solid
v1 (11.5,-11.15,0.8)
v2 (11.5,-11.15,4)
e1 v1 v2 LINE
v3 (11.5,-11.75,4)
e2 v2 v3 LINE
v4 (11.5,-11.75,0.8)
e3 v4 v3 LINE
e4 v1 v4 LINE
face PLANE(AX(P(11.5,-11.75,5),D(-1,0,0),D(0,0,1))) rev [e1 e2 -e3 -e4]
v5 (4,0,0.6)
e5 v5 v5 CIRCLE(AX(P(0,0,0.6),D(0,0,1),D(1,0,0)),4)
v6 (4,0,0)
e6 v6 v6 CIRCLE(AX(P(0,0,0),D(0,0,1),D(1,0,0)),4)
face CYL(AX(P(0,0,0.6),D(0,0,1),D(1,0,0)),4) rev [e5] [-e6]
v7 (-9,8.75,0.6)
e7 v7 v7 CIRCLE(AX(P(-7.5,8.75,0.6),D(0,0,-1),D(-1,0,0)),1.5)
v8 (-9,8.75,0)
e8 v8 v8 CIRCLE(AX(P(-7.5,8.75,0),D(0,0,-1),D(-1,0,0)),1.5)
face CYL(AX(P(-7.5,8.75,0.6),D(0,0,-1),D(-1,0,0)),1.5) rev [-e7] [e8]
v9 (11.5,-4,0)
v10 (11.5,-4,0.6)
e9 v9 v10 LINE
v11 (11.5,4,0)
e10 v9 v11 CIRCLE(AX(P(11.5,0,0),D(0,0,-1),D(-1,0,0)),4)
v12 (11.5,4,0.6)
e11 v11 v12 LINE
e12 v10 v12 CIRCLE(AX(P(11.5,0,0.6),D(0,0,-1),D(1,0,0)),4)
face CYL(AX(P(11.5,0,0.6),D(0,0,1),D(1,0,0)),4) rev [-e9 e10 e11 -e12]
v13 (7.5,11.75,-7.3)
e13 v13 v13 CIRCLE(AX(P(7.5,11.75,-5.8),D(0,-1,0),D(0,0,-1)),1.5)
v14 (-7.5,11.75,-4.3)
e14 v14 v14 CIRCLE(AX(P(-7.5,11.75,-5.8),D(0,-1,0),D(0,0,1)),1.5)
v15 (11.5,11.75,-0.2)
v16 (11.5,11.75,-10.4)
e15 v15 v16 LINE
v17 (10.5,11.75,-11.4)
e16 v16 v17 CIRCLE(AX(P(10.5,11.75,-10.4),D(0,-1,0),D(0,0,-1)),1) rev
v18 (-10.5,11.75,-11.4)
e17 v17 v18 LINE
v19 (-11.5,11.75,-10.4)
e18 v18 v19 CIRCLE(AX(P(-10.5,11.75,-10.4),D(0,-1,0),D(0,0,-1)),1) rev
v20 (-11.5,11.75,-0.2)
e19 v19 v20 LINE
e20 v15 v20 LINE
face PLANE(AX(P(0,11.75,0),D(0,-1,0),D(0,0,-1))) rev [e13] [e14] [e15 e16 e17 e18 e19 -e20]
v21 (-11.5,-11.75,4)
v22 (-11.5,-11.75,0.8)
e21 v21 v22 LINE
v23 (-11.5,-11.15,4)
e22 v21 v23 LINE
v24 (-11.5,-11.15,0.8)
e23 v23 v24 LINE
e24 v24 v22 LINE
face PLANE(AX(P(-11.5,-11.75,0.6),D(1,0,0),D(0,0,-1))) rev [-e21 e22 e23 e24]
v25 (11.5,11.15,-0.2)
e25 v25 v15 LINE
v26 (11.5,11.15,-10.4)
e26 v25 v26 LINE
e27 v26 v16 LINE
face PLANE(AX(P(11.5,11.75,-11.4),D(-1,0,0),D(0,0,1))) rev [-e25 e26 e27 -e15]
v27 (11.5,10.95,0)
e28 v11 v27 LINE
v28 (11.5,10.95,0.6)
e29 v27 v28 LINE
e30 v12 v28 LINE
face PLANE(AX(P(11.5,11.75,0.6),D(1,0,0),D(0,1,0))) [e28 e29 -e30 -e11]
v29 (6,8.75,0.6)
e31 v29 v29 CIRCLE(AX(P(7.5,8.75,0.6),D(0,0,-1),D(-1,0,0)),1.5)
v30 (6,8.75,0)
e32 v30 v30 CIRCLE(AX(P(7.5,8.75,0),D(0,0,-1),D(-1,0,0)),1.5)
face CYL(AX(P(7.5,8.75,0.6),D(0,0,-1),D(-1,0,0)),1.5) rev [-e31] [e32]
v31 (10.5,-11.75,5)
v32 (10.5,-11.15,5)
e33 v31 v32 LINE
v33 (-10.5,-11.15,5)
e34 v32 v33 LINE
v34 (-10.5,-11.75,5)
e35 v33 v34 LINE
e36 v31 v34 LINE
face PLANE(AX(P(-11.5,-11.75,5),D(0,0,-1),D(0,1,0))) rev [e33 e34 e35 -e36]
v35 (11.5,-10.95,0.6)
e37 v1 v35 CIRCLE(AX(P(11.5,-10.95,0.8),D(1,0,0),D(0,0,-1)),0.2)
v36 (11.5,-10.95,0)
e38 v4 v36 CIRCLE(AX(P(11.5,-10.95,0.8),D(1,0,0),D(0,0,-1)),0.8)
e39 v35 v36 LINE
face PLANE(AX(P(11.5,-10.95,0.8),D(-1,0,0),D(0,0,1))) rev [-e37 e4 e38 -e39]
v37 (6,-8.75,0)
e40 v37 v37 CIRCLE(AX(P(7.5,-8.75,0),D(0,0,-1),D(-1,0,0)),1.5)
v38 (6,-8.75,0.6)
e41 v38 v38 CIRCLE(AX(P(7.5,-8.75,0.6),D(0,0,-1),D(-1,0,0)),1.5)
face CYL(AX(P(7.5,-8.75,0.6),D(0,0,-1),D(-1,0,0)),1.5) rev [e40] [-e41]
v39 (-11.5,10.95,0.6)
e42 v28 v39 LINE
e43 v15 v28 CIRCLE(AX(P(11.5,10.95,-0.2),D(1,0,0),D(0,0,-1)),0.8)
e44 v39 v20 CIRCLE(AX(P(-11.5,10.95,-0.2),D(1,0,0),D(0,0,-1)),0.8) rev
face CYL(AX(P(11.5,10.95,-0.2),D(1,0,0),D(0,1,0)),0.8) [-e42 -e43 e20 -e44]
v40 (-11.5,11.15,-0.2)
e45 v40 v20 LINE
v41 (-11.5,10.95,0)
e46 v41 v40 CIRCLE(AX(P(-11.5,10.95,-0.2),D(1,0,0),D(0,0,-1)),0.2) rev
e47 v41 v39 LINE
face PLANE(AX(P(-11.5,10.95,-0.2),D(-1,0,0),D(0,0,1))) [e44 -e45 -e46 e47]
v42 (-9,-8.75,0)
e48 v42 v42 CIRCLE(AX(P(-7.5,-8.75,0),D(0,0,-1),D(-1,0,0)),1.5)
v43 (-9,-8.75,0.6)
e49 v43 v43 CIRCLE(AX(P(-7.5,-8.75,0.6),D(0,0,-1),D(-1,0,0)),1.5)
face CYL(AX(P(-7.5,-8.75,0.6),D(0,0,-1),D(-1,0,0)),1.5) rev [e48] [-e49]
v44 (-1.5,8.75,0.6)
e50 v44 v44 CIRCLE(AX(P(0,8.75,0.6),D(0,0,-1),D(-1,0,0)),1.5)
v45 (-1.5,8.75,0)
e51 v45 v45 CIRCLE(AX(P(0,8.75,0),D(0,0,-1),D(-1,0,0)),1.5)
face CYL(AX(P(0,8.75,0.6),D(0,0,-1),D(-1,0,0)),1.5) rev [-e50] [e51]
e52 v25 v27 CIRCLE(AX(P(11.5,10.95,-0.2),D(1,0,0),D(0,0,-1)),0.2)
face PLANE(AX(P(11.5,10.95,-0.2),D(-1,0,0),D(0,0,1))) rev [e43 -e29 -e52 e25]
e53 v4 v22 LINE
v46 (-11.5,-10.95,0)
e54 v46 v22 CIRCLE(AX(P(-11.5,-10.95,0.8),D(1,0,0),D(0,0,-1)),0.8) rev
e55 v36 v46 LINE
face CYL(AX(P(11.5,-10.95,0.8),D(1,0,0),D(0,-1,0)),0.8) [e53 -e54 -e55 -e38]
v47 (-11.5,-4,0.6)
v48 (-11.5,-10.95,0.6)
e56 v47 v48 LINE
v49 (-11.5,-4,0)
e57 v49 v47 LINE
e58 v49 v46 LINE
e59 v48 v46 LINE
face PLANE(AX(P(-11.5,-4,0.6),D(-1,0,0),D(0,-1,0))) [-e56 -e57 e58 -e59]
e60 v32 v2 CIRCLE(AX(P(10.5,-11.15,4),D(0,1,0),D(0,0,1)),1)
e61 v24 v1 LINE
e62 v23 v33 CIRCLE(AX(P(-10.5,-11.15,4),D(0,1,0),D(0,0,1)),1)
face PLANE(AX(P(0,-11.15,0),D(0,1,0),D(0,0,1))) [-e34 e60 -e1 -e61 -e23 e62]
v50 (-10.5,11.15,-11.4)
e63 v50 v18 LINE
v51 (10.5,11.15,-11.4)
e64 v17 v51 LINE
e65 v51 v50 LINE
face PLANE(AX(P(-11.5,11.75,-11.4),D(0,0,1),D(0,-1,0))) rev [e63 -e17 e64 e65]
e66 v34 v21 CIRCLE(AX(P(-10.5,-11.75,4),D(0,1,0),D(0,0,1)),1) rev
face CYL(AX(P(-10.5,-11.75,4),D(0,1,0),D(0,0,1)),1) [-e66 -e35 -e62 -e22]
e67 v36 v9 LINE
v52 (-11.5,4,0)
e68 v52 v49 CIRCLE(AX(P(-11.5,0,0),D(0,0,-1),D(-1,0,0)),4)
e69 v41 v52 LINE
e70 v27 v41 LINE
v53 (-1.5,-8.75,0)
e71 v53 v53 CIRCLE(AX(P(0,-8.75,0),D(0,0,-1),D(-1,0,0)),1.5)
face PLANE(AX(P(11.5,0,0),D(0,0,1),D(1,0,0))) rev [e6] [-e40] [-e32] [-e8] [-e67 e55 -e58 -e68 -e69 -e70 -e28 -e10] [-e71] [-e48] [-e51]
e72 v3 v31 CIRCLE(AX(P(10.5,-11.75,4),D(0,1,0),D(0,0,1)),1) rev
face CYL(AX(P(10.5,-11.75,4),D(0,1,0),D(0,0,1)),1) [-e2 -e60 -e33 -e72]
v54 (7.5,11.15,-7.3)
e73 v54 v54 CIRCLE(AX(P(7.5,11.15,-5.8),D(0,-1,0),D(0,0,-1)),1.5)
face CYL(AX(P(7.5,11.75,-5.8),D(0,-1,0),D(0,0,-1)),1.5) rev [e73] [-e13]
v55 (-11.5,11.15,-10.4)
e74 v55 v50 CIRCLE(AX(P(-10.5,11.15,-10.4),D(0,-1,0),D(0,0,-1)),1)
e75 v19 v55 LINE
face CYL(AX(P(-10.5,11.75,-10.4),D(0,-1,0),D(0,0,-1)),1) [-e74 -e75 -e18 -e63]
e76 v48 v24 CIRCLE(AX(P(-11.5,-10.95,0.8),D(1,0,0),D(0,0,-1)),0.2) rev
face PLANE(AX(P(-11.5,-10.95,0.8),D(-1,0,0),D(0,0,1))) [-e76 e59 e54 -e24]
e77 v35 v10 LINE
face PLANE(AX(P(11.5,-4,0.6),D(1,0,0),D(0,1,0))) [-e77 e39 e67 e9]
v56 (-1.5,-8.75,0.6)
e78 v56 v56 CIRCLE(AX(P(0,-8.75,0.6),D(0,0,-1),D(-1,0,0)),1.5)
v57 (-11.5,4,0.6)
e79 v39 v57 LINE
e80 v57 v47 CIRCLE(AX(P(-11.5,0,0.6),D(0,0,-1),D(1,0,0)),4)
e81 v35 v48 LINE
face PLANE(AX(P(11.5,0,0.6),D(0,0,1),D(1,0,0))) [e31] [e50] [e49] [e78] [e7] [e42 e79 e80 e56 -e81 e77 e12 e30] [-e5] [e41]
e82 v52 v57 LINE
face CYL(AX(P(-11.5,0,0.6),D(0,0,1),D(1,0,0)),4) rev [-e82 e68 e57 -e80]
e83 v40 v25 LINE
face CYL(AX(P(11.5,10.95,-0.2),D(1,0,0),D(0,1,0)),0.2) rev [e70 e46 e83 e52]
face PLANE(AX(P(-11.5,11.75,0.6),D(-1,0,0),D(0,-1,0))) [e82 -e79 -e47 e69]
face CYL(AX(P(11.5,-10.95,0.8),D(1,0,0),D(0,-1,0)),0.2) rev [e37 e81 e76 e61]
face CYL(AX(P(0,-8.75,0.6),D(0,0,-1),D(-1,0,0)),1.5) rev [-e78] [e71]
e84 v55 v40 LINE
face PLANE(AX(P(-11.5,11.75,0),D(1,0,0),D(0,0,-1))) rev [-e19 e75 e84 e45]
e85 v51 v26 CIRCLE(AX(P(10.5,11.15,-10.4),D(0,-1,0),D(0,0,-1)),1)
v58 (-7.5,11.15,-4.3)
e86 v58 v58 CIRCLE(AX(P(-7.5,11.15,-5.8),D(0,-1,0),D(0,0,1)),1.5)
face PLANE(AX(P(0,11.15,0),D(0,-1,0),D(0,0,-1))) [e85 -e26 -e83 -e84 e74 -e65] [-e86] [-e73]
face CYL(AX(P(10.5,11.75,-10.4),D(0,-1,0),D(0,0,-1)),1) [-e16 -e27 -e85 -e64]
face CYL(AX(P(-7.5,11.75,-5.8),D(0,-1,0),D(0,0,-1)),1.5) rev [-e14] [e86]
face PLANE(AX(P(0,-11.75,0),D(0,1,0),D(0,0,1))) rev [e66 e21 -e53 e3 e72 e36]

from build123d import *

# Parameters (mm, degrees)
SKETCH1_R                    = 4
BOSS_EXTRUDE1_DEPTH          = 0.6
EDGE_FLANGE1_STRIP_W         = 2.8
EDGE_FLANGE1_STRIP_H         = 0.6
EDGE_FLANGE1_STRIP_CUT_DEPTH = 23
EDGE_FLANGE1_DEPTH           = 23
SKETCH14_R                   = 1.5
CUT_EXTRUDE3_DEPTH           = 21.00681134
EDGE_FLANGE2_STRIP_W         = 2.8
EDGE_FLANGE2_STRIP_H         = 0.6
EDGE_FLANGE2_STRIP_CUT_DEPTH = 23
EDGE_FLANGE2_DEPTH           = 23
SKETCH13_R                   = 1.5
CUT_EXTRUDE1_DEPTH           = 29.046746692
FILLET2_R                    = 1


# Sheet-metal steps are written as plain solids
with BuildPart() as part:
    # Sketch1 → Boss-Extrude1 (new body)
    with BuildSketch(Plane.XY):
        with BuildLine():
            Line((11.5, -4), (11.5, -11.75))
            Line((11.5, -11.75), (-11.5, -11.75))
            Line((-11.5, -11.75), (-11.5, -4))
            ThreePointArc((-11.5, -4), (-7.5, 0), (-11.5, 4))
            Line((-11.5, 4), (-11.5, 11.75))
            Line((-11.5, 11.75), (11.5, 11.75))
            Line((11.5, 11.75), (11.5, 4))
            ThreePointArc((11.5, 4), (7.5, 0), (11.5, -4))
        make_face()
        Circle(SKETCH1_R, mode=Mode.SUBTRACT)
    extrude(amount=BOSS_EXTRUDE1_DEPTH)

    # Edge-Flange1 strip (across the edge) → Edge-Flange1 strip cut (cut)
    with BuildSketch(Plane(origin=(-11.5, 11.75, 0), x_dir=(0, -1, 0), z_dir=(1, 0, 0))):
        with Locations((-0.6, -0.3)):
            Rectangle(EDGE_FLANGE1_STRIP_W, EDGE_FLANGE1_STRIP_H)
    extrude(amount=EDGE_FLANGE1_STRIP_CUT_DEPTH, mode=Mode.SUBTRACT)

    # Edge-Flange1 section (across the edge) → Edge-Flange1 (add)
    with BuildSketch(Plane(origin=(-11.5, 11.75, 0), x_dir=(0, -1, 0), z_dir=(1, 0, 0))):
        with BuildLine():
            Line((0, 0.2), (0, 11.4))
            Line((0, 11.4), (0.6, 11.4))
            Line((0.6, 11.4), (0.6, 0.2))
            ThreePointArc((0.6, 0.2), (0.658578644, 0.058578644), (0.8, 0))
            Line((0.8, 0), (0.8, -0.6))
            ThreePointArc((0.8, -0.6), (0.234314575, -0.365685425), (0, 0.2))
        make_face()
    extrude(amount=EDGE_FLANGE1_DEPTH)

    # Sketch14 → Cut-Extrude3 (cut, through all)
    with BuildSketch(Plane(origin=(0, 0, 0), x_dir=(-1, 0, 0), z_dir=(0, 0, -1))):
        with Locations((-7.5, -8.75)):
            Circle(SKETCH14_R)
        with Locations((0, -8.75)):
            Circle(SKETCH14_R)
        with Locations((7.5, -8.75)):
            Circle(SKETCH14_R)
        with Locations((7.5, 8.75)):
            Circle(SKETCH14_R)
        with Locations((0, 8.75)):
            Circle(SKETCH14_R)
        with Locations((-7.5, 8.75)):
            Circle(SKETCH14_R)
    extrude(amount=-CUT_EXTRUDE3_DEPTH, mode=Mode.SUBTRACT)

    # Edge-Flange2 strip (across the edge) → Edge-Flange2 strip cut (cut)
    with BuildSketch(Plane(origin=(-11.5, -11.75, 0.6), x_dir=(0, 1, 0), z_dir=(1, 0, 0))):
        with Locations((-0.6, -0.3)):
            Rectangle(EDGE_FLANGE2_STRIP_W, EDGE_FLANGE2_STRIP_H)
    extrude(amount=EDGE_FLANGE2_STRIP_CUT_DEPTH, mode=Mode.SUBTRACT)

    # Edge-Flange2 section (across the edge) → Edge-Flange2 (add)
    with BuildSketch(Plane(origin=(-11.5, -11.75, 0.6), x_dir=(0, 1, 0), z_dir=(1, 0, 0))):
        with BuildLine():
            Line((0, 0.2), (0, 4.4))
            Line((0, 4.4), (0.6, 4.4))
            Line((0.6, 4.4), (0.6, 0.2))
            ThreePointArc((0.6, 0.2), (0.658578644, 0.058578644), (0.8, 0))
            Line((0.8, 0), (0.8, -0.6))
            ThreePointArc((0.8, -0.6), (0.234314575, -0.365685425), (0, 0.2))
        make_face()
    extrude(amount=EDGE_FLANGE2_DEPTH)

    # Sketch13 → Cut-Extrude1 (cut, through all)
    with BuildSketch(Plane.XZ.offset(-11.15)):
        with Locations(Location((7.5, -5.8, 0), (0, 0, 270))):
            Circle(SKETCH13_R)
        with Locations(Location((-7.5, -5.8, 0), (0, 0, 90))):
            Circle(SKETCH13_R)
    extrude(amount=-CUT_EXTRUDE1_DEPTH, mode=Mode.SUBTRACT)

    # Fillet2
    fillet2_edges = [part.edges().sort_by_distance(p)[0] for p in [
        (-11.5, -11.45, 5),
        (11.5, -11.45, 5),
        (-11.5, 11.45, -11.4),
        (11.5, 11.45, -11.4),
    ]]
    fillet(fillet2_edges, radius=FILLET2_R)


solid = part.part
